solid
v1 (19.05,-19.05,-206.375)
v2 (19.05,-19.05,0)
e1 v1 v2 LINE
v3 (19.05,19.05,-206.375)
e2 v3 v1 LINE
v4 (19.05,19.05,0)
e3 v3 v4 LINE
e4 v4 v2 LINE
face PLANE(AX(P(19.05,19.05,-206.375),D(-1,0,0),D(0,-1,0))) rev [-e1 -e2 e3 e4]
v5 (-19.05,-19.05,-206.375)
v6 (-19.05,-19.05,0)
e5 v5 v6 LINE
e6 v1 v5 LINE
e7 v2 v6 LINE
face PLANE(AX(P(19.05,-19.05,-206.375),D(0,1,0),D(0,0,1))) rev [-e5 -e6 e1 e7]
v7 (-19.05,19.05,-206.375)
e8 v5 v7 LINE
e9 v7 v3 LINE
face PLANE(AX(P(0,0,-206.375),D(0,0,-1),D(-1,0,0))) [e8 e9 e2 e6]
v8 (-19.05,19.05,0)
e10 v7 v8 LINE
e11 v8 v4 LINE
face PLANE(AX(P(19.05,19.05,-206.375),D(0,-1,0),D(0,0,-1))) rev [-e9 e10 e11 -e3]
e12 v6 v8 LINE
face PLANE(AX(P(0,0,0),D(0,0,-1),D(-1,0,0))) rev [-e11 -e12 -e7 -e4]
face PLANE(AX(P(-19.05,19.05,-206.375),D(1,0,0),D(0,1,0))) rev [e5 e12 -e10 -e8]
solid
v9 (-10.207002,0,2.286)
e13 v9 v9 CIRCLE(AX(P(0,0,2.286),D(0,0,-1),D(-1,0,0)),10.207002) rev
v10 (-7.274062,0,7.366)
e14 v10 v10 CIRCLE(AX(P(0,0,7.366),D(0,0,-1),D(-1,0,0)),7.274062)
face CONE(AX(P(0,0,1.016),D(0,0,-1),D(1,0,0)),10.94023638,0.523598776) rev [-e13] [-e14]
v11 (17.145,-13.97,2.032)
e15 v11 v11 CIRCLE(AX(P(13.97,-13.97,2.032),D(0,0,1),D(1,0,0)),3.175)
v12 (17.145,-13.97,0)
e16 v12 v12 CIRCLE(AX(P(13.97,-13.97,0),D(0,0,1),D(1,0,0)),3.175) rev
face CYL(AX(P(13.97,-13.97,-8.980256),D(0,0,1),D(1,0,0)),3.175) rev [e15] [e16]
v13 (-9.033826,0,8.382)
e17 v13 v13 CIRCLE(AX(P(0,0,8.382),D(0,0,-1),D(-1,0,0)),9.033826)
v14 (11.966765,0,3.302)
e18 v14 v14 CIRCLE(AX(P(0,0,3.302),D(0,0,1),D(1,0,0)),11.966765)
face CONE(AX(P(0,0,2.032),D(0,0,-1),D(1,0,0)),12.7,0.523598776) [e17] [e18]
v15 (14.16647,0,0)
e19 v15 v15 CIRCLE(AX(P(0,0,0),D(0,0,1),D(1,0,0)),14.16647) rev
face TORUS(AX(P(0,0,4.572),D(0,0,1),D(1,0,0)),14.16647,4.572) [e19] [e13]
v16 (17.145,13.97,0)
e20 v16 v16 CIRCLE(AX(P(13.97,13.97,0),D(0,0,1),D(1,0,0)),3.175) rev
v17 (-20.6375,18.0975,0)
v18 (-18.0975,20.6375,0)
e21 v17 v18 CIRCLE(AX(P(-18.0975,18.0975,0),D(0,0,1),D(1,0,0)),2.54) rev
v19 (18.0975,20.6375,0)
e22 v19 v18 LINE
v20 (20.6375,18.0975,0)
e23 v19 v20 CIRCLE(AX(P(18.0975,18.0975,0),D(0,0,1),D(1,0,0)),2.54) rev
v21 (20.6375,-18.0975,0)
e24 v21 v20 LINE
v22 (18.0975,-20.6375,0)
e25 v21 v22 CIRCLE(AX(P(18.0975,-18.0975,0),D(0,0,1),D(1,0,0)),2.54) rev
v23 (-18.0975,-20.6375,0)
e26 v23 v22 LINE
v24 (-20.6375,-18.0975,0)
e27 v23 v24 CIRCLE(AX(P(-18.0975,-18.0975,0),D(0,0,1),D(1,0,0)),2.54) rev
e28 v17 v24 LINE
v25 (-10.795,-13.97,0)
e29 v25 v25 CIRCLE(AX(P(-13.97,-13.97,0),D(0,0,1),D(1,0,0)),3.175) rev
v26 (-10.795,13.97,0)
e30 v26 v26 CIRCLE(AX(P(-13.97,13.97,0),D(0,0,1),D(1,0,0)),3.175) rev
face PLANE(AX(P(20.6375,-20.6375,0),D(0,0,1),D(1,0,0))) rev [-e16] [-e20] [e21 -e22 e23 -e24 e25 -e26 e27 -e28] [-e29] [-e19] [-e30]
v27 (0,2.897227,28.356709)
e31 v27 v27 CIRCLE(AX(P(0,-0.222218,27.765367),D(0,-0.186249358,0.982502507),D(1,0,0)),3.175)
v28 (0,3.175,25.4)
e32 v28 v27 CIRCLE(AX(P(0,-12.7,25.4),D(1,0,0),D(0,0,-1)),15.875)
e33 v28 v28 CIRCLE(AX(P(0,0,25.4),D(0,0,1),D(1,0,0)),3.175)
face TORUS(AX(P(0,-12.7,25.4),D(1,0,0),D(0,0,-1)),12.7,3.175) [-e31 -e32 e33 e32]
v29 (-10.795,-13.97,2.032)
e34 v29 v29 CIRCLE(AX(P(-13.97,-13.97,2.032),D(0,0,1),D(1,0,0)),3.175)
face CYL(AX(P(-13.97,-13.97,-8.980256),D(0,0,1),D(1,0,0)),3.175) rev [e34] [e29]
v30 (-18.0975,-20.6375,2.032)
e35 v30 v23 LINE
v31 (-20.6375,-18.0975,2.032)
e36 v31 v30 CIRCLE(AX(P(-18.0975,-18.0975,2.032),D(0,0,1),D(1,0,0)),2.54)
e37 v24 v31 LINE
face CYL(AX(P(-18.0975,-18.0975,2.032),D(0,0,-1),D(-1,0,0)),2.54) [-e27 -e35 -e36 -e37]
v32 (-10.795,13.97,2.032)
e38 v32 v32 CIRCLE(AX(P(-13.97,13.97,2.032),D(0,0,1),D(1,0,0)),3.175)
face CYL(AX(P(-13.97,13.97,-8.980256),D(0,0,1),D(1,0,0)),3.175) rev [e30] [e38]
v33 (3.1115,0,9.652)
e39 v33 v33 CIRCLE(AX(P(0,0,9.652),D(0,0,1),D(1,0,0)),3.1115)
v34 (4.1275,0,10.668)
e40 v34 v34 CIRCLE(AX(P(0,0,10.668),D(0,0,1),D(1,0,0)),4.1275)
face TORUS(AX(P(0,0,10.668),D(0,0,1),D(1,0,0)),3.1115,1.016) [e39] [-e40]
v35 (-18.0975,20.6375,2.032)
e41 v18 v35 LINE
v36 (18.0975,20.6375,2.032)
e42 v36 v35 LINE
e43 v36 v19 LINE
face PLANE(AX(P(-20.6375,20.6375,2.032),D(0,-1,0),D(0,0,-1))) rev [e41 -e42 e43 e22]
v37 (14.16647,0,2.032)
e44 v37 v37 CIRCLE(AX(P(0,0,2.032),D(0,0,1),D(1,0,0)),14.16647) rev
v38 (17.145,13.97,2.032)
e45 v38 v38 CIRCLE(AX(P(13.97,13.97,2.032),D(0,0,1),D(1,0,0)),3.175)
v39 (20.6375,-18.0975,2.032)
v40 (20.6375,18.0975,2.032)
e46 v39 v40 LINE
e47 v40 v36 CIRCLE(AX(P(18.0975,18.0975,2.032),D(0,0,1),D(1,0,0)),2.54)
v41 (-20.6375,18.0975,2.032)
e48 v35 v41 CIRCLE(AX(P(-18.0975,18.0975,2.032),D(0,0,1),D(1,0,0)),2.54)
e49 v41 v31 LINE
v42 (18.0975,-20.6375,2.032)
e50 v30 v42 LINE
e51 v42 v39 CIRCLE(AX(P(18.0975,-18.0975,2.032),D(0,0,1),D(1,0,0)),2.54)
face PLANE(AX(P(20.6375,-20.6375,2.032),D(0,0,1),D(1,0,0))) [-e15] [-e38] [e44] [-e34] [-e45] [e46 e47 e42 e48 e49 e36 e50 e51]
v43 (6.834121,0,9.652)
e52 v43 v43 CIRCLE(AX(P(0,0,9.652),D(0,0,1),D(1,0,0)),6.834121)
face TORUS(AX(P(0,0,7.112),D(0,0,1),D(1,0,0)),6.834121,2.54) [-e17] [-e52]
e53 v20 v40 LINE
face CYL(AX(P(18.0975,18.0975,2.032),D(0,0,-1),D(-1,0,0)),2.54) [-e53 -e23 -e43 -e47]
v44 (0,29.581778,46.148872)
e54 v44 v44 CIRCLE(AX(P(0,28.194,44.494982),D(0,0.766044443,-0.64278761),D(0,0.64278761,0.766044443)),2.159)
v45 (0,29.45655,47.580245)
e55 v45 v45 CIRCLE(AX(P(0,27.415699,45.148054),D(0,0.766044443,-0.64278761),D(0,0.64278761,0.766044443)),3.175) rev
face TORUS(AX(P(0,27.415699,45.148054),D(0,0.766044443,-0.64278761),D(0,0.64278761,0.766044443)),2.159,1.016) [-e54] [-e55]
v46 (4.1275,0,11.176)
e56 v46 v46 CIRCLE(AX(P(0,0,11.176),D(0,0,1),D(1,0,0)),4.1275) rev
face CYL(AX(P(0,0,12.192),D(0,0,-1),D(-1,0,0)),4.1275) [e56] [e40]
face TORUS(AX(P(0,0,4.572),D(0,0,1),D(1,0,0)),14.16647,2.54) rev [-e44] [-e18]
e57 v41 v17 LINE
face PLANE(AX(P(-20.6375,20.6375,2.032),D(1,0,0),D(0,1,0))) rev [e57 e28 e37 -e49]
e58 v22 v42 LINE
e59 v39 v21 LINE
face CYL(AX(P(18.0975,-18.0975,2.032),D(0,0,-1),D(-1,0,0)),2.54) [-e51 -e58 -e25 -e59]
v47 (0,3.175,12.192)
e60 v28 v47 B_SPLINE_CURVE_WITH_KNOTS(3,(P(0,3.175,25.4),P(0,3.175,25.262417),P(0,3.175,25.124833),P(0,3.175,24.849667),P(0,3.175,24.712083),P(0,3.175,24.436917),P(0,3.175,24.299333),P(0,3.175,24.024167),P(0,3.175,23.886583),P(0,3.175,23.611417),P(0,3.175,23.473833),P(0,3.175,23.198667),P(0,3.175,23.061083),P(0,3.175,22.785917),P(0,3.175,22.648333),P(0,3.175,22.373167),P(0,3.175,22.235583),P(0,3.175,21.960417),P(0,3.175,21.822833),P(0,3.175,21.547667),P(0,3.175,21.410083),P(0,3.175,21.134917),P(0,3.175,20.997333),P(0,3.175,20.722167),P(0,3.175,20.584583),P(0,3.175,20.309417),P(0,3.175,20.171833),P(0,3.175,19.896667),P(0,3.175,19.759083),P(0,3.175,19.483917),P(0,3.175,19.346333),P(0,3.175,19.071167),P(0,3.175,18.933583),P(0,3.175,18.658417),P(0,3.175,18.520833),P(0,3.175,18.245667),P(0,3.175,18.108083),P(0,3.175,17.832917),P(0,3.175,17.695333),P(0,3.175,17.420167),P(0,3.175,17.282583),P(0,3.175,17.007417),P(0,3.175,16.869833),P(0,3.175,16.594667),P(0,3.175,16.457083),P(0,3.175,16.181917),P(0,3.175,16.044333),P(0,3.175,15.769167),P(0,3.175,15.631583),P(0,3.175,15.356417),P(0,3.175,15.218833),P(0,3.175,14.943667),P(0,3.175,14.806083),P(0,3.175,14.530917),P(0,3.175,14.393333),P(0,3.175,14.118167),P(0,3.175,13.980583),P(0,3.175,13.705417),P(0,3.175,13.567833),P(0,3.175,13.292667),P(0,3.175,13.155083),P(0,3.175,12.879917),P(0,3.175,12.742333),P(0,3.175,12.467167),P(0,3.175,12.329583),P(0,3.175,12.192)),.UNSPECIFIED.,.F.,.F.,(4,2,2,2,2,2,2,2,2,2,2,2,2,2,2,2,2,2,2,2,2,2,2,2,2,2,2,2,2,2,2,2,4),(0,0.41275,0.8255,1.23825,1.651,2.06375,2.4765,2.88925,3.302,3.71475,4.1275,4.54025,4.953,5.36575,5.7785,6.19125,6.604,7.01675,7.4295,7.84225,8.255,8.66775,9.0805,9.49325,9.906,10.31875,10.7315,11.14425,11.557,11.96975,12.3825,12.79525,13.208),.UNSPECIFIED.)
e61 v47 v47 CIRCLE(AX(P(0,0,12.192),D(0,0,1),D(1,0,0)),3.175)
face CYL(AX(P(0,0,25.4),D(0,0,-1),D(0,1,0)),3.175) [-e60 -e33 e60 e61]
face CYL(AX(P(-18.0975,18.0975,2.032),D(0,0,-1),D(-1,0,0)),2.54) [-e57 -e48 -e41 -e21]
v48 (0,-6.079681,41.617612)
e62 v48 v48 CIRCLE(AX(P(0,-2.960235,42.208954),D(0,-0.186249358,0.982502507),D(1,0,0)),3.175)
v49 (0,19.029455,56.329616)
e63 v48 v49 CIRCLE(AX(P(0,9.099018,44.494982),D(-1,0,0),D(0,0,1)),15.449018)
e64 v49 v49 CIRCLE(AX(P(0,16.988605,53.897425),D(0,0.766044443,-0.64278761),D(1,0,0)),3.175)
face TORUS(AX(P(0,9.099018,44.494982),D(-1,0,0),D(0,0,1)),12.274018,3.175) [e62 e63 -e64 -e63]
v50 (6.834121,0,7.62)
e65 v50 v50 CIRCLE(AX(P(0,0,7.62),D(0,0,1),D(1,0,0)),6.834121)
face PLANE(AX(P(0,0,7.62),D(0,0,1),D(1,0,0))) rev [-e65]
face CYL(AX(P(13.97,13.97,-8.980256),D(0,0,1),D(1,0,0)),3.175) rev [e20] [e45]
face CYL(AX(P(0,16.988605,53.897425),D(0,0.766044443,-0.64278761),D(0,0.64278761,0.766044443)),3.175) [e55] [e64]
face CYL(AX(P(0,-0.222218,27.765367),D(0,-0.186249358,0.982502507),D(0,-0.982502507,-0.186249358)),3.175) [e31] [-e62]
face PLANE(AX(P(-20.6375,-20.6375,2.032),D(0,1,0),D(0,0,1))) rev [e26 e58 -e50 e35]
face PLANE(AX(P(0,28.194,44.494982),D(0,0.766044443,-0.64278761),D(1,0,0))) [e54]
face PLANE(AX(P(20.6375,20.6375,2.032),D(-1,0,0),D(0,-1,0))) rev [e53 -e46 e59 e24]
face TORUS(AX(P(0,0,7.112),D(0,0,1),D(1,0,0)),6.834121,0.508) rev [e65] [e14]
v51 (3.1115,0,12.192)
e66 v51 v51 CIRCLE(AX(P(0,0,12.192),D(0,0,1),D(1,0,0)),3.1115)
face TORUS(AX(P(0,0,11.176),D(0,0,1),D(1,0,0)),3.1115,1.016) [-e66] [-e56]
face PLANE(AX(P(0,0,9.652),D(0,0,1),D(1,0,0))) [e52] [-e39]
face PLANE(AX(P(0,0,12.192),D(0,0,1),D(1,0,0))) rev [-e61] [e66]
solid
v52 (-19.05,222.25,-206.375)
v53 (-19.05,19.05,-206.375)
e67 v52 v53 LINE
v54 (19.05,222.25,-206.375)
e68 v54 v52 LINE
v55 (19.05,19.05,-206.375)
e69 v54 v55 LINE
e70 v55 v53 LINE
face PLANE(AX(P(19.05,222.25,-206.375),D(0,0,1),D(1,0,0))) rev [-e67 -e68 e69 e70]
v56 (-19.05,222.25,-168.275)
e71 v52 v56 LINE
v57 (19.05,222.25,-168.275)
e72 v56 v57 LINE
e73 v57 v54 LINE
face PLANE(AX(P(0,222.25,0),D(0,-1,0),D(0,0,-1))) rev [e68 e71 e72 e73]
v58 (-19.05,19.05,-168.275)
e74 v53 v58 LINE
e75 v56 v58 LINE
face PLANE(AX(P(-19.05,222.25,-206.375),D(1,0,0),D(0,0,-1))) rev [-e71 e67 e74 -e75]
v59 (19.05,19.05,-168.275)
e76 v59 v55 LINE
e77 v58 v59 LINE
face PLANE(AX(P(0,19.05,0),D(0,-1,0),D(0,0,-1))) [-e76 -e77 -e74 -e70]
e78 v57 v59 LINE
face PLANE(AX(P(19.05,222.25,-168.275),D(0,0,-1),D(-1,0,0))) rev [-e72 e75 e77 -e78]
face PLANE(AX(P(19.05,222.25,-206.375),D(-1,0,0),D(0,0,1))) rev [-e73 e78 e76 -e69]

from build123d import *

# Parameters (mm, degrees)
SKETCH1_W           = 41.275
SKETCH1_H           = 41.275
BOSS_EXTRUDE1_DEPTH = 2.032
SKETCH2_R           = 12.7
BOSS_EXTRUDE2_DEPTH = 7.62
BOSS_EXTRUDE2_TAPER = 30
FILLET3_R           = 2.54
FILLET1_R           = 2.54
SKETCH3_R           = 4.1275
BOSS_EXTRUDE3_DEPTH = 2.54
FILLET4_R           = 1.016
SKETCH5_R           = 3.175
FILLET2_R           = 1.016
SKETCH6_R           = 3.175
CUT_EXTRUDE1_DEPTH  = 2.032
SKETCH7_W           = 38.1
SKETCH7_H           = 38.1
BOSS_EXTRUDE4_DEPTH = 206.375
SKETCH9_W           = 38.1
SKETCH9_H           = 38.1
BOSS_EXTRUDE5_DEPTH = 203.2


# Read off the part's stored shape, not the designer's step: Shell1
with BuildPart() as part:
    # Sketch1 → Boss-Extrude1 (new body)
    with BuildSketch(Plane.XY):
        Rectangle(SKETCH1_W, SKETCH1_H)
    extrude(amount=BOSS_EXTRUDE1_DEPTH)

    # Sketch2 → Boss-Extrude2 (add)
    with BuildSketch(Plane.XY.offset(2.032)):
        Circle(SKETCH2_R)
    extrude(amount=BOSS_EXTRUDE2_DEPTH, taper=BOSS_EXTRUDE2_TAPER)

    # Fillet3
    fillet3_edges = [part.edges().sort_by_distance(p)[0] for p in [
        (-12.7, 0, 2.032),
        (-8.300590949, 0, 9.652),
    ]]
    fillet(fillet3_edges, radius=FILLET3_R)

    # Shell1 outline → Shell1 (revolve, cut)
    with BuildSketch(Plane.XZ):
        with BuildLine():
            Line((10.207001538, 2.286), (7.27406217, 7.366))
            ThreePointArc((7.27406217, 7.366), (7.088121265, 7.551940905), (6.834121265, 7.62))
            Line((6.834121265, 7.62), (0, 7.62))
            Line((0, 7.62), (0, 0))
            Line((0, 0), (14.166469684, 0))
            ThreePointArc((14.166469684, 0), (11.880469684, 0.612531854), (10.207001538, 2.286))
        make_face()
    revolve(axis=Axis((0, 0, 0), (0, 0, 1)), mode=Mode.SUBTRACT)

    # Fillet1
    fillet1_edges = [part.edges().sort_by_distance(p)[0] for p in [
        (20.6375, -20.6375, 1.016),
        (-20.6375, -20.6375, 1.016),
        (-20.6375, 20.6375, 1.016),
        (20.6375, 20.6375, 1.016),
    ]]
    fillet(fillet1_edges, radius=FILLET1_R)


with BuildPart() as body_2:
    # Sketch3 → Boss-Extrude3 (new body)
    with BuildSketch(Plane.XY.offset(9.652)):
        Circle(SKETCH3_R)
    extrude(amount=BOSS_EXTRUDE3_DEPTH)

    # Fillet4
    fillet4_edges = [body_2.edges().sort_by_distance(p)[0] for p in [
        (-4.1275, 0, 9.652),
        (-4.1275, 0, 12.192),
    ]]
    fillet(fillet4_edges, radius=FILLET4_R)


with BuildPart() as part_1:
    add(part.part)

    # Combine1: union body 2
    add(body_2.part)

    # Sweep1: sweep along a path in Sketch4
    with BuildLine(Plane(origin=(0, 0, 0), x_dir=(0, 0, -1), z_dir=(1, 0, 0))) as sweep1_path:
        Line((-12.192, 0), (-25.4, 0))
        ThreePointArc((-25.4, 0), (-26.587891118, -0.055676582), (-27.765366848, -0.222218159))
        Line((-27.765366848, -0.222218159), (-42.208954144, -2.96023546))
        ThreePointArc((-42.208954144, -2.96023546), (-55.085066883, 2.89405056), (-53.897425307, 16.988604528))
        Line((-53.897425307, 16.988604528), (-44.494982099, 28.194))
    # Sketch5 → Sweep1 (sweep)
    with BuildSketch(Plane.XY.offset(12.192)):
        Circle(SKETCH5_R)
    sweep(path=sweep1_path.line)

    # Fillet2
    fillet2_edges = [part_1.edges().sort_by_distance(p)[0] for p in [
        (-3.175, 28.194, 44.494982099),
    ]]
    fillet(fillet2_edges, radius=FILLET2_R)

    # Sketch6 → Cut-Extrude1 (cut)
    with BuildSketch(Plane.XY.offset(2.032)):
        with Locations((-13.97, -13.97)):
            Circle(SKETCH6_R)
        with Locations((13.97, -13.97)):
            Circle(SKETCH6_R)
        with Locations((13.97, 13.97)):
            Circle(SKETCH6_R)
        with Locations((-13.97, 13.97)):
            Circle(SKETCH6_R)
    extrude(amount=-CUT_EXTRUDE1_DEPTH, mode=Mode.SUBTRACT)


with BuildPart() as body_2_2:
    # Sketch7 → Boss-Extrude4 (new body)
    with BuildSketch(Plane(origin=(0, 0, 0), x_dir=(-1, 0, 0), z_dir=(0, 0, -1))):
        Rectangle(SKETCH7_W, SKETCH7_H)
    extrude(amount=BOSS_EXTRUDE4_DEPTH)


with BuildPart() as body_3:
    # Sketch9 → Boss-Extrude5 (new body)
    with BuildSketch(Plane(origin=(0, 19.05, 0), x_dir=(1, 0, 0), z_dir=(0, 1, 0))):
        with Locations((0, 187.325)):
            Rectangle(SKETCH9_W, SKETCH9_H)
    extrude(amount=BOSS_EXTRUDE5_DEPTH)


solid = Compound([part_1.part, body_2_2.part, body_3.part])
